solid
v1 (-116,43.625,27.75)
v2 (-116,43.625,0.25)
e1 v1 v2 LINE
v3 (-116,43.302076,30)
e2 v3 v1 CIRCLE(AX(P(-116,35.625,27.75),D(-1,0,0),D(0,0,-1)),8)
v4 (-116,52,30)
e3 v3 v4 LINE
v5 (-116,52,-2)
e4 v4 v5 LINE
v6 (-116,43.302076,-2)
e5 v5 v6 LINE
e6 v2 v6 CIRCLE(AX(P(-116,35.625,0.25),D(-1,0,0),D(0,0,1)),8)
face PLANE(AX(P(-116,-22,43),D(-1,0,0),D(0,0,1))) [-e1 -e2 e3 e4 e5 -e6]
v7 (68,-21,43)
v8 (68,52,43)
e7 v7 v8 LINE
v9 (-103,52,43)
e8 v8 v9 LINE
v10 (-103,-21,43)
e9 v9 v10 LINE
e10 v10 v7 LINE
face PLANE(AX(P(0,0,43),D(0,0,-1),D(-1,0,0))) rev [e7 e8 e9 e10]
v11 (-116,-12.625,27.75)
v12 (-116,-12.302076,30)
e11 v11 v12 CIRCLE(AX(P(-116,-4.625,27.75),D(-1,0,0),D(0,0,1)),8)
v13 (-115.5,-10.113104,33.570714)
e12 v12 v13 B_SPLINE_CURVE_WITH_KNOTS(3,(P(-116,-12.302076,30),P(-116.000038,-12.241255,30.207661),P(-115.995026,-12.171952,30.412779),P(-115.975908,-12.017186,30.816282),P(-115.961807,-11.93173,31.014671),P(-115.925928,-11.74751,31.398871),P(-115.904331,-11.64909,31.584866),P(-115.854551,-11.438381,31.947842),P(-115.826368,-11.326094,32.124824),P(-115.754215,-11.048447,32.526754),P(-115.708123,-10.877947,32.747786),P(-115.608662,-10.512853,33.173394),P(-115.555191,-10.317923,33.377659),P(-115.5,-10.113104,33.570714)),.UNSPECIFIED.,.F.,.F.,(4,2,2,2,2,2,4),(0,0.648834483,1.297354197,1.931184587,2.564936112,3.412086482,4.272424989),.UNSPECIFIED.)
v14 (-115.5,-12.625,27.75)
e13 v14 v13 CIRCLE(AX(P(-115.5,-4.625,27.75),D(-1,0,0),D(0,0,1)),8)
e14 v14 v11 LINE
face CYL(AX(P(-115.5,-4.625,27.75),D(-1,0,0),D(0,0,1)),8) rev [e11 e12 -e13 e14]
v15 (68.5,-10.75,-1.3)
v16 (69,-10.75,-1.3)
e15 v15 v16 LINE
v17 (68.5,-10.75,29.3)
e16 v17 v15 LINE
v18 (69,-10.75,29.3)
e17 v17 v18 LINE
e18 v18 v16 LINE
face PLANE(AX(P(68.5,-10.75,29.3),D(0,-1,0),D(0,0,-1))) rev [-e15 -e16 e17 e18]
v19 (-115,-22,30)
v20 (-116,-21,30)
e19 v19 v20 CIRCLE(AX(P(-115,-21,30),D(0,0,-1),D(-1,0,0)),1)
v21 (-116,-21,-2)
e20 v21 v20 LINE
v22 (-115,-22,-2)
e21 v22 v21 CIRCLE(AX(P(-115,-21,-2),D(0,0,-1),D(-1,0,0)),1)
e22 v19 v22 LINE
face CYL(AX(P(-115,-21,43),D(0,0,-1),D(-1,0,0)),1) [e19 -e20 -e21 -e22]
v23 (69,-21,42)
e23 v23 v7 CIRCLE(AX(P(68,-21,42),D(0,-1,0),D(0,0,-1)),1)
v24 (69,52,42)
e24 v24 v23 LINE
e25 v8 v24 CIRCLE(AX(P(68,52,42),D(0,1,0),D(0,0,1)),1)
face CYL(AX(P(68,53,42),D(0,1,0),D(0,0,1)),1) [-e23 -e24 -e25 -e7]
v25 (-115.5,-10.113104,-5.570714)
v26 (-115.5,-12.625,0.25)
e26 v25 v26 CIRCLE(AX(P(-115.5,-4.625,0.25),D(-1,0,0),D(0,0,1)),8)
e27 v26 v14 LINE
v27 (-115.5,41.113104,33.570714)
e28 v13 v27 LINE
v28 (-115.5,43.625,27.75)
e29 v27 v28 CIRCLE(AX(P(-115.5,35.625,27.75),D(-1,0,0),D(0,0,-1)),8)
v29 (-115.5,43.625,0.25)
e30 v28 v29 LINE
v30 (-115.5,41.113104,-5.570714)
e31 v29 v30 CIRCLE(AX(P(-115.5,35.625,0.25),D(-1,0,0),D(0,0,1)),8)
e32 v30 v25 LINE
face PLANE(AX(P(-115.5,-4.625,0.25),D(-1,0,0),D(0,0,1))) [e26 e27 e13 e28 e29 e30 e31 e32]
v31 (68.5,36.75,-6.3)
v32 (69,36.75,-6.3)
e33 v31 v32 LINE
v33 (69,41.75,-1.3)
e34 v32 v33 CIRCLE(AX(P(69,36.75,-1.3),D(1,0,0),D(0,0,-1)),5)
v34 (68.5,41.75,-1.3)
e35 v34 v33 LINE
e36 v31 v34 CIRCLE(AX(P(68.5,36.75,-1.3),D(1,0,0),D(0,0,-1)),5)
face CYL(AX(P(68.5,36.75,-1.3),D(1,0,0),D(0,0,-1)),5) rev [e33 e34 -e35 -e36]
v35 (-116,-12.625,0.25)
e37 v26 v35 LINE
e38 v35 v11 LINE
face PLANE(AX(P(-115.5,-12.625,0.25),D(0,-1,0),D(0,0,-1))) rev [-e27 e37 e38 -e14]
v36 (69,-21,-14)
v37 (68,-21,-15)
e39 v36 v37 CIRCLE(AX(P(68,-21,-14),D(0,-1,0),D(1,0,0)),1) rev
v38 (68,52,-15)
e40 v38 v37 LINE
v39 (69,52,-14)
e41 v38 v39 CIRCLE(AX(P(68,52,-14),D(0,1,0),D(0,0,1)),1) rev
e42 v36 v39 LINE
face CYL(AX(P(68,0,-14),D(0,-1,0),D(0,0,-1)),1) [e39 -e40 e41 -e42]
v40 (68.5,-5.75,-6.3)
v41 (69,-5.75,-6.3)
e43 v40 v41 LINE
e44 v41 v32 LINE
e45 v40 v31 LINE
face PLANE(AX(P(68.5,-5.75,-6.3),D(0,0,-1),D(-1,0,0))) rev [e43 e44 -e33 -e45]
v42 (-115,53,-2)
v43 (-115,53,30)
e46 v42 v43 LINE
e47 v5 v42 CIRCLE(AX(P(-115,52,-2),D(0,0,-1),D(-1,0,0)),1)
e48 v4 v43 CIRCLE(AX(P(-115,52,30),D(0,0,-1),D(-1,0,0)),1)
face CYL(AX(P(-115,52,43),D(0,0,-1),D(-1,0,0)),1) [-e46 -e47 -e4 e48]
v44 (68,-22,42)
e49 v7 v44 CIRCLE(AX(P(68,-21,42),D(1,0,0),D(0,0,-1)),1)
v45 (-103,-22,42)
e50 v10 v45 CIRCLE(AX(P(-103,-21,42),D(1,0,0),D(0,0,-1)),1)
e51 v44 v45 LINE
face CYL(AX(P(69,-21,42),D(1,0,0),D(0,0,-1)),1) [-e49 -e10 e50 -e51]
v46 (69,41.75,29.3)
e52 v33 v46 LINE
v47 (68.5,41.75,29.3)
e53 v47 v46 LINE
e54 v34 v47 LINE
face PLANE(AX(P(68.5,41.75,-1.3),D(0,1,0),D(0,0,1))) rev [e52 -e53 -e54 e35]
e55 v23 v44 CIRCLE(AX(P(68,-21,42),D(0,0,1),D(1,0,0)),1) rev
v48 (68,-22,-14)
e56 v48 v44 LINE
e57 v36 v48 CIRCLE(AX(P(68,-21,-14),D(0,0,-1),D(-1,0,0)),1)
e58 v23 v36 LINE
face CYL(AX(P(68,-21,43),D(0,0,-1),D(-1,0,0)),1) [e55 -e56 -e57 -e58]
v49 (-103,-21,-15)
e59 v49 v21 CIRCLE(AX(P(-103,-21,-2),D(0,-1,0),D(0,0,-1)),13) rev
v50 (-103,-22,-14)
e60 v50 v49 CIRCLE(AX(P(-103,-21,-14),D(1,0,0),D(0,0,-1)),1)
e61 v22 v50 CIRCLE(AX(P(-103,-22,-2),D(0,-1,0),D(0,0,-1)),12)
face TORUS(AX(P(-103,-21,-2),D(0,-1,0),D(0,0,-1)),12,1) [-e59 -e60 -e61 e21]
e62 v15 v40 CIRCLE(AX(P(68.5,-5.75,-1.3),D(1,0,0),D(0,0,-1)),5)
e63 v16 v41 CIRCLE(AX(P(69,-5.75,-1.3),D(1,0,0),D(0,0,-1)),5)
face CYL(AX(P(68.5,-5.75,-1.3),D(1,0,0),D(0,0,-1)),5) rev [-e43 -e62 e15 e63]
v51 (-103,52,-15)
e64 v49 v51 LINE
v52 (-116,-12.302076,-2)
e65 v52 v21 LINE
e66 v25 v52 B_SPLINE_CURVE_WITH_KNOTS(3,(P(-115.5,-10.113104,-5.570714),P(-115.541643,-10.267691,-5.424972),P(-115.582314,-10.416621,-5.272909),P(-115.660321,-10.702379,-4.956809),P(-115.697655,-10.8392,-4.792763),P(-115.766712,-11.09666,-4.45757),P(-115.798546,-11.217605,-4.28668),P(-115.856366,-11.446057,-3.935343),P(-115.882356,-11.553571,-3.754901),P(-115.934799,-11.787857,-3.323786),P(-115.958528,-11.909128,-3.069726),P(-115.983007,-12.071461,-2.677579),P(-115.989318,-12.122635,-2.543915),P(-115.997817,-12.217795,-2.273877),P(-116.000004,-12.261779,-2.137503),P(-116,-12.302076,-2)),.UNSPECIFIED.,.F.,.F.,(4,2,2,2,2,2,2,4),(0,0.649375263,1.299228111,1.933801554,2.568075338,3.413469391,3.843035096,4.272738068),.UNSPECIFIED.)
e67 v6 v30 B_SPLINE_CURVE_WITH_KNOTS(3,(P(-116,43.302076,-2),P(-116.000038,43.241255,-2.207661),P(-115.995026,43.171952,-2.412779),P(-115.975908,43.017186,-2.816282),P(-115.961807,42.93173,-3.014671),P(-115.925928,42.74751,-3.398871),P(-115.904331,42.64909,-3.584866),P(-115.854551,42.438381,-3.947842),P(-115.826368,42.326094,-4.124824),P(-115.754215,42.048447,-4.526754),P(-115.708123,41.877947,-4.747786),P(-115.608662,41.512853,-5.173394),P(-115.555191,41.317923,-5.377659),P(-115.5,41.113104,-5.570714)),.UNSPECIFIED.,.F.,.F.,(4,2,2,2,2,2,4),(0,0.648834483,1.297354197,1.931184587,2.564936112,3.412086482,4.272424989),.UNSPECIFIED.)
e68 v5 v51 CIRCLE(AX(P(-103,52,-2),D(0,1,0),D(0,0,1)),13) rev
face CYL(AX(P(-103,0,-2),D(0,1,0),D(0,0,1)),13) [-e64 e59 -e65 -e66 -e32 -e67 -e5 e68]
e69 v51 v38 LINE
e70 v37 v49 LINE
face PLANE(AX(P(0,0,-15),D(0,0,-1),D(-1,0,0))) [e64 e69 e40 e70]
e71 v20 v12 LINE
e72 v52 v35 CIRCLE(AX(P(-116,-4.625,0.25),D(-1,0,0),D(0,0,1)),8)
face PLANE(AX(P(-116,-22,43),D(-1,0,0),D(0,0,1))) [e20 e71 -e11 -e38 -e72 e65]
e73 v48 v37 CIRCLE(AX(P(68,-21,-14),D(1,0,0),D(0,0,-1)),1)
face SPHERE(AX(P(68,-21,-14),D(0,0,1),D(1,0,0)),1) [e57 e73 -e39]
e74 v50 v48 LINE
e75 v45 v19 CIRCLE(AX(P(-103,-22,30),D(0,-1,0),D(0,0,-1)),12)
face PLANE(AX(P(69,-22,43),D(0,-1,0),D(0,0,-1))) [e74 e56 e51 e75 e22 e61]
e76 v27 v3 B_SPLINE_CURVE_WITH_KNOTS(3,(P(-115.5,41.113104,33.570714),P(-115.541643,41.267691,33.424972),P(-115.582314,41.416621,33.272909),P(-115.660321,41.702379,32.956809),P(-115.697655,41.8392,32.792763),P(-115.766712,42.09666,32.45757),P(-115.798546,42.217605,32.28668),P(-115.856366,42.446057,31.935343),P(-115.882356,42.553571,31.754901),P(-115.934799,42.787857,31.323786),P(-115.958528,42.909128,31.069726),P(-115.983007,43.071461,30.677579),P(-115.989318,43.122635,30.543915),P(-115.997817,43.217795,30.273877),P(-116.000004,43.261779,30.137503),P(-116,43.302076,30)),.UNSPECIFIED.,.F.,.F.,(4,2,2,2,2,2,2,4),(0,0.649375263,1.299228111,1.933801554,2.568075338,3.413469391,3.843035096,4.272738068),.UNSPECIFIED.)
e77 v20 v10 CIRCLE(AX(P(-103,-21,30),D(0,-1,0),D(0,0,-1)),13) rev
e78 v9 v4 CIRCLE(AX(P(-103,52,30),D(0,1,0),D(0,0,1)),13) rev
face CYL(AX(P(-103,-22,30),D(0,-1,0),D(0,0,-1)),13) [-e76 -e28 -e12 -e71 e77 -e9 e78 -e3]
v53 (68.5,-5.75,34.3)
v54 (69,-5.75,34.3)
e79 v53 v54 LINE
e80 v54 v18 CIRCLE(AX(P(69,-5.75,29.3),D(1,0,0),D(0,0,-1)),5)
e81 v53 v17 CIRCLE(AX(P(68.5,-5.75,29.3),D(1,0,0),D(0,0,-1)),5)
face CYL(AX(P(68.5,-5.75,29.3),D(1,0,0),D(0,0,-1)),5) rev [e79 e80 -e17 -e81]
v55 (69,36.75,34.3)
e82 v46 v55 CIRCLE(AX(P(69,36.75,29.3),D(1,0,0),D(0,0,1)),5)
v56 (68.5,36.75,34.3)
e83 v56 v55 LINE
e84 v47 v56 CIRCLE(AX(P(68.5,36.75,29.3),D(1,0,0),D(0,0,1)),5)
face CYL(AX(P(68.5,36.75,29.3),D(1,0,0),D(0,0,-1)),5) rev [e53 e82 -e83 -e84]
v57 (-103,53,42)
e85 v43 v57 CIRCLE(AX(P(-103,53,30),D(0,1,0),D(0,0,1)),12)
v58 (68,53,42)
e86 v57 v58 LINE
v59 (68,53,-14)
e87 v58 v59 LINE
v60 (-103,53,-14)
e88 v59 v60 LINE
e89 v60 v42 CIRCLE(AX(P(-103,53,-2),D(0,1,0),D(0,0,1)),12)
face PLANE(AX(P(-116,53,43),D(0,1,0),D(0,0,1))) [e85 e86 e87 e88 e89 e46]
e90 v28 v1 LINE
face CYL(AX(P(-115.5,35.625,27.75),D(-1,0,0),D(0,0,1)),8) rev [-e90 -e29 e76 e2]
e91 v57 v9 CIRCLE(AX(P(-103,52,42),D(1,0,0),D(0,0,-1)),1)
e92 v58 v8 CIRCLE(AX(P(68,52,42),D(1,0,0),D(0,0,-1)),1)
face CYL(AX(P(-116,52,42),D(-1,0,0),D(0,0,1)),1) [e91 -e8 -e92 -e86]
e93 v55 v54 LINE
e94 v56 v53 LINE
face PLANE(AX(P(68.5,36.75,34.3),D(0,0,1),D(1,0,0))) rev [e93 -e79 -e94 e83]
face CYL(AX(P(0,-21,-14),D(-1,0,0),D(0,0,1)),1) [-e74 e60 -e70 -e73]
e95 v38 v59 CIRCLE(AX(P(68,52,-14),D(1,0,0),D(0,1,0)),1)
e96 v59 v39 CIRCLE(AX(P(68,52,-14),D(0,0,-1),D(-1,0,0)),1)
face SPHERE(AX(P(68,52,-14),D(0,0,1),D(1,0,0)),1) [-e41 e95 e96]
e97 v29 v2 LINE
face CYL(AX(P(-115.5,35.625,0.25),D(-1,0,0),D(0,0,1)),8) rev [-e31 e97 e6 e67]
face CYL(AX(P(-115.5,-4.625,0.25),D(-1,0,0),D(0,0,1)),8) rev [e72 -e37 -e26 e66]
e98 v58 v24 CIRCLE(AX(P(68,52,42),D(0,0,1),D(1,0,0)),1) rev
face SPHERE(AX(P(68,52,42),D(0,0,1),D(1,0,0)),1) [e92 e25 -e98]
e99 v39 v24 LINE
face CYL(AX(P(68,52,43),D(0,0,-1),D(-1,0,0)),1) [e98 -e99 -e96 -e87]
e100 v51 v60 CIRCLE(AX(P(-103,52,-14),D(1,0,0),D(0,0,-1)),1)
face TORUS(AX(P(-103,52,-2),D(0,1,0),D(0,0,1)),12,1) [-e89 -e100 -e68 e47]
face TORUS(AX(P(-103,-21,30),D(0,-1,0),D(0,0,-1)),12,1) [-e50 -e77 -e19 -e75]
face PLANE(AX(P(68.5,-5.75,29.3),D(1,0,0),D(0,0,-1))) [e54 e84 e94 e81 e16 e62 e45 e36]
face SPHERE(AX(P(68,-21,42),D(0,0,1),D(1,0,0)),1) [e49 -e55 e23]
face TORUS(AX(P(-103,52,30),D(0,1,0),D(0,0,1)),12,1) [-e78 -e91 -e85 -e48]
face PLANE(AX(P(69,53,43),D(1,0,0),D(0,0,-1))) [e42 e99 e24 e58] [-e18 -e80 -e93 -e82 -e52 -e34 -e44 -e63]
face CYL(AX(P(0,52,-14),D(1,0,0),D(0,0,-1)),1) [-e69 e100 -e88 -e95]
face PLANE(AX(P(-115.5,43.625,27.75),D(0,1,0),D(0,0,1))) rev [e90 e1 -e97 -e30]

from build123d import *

# Parameters (mm, degrees)
SKETCH1_W           = 185
SKETCH1_H           = 75
BOSS_EXTRUDE1_DEPTH = 58
CUT_EXTRUDE1_DEPTH  = 0.5
CUT_EXTRUDE2_DEPTH  = 0.5
FILLET1_R           = 13
FILLET2_R           = 1


with BuildPart() as part:
    # Sketch1 → Boss-Extrude1 (new body)
    with BuildSketch(Plane(origin=(0, 0, -15), x_dir=(-1, 0, 0), z_dir=(0, 0, -1))):
        with Locations((23.5, 15.5)):
            Rectangle(SKETCH1_W, SKETCH1_H)
    extrude(amount=-BOSS_EXTRUDE1_DEPTH)

    # Sketch2 → Cut-Extrude1 (cut)
    with BuildSketch(Plane(origin=(69, 0, 0), x_dir=(0, 0, -1), z_dir=(1, 0, 0))):
        with BuildLine():
            Line((-34.3, 36.75), (-34.3, -5.75))
            ThreePointArc((-34.3, -5.75), (-32.835533906, -9.285533906), (-29.3, -10.75))
            Line((-29.3, -10.75), (1.3, -10.75))
            ThreePointArc((1.3, -10.75), (4.835533906, -9.285533906), (6.3, -5.75))
            Line((6.3, -5.75), (6.3, 36.75))
            ThreePointArc((6.3, 36.75), (4.835533906, 40.285533906), (1.3, 41.75))
            Line((1.3, 41.75), (-29.3, 41.75))
            ThreePointArc((-29.3, 41.75), (-32.835533906, 40.285533906), (-34.3, 36.75))
        make_face()
    extrude(amount=-CUT_EXTRUDE1_DEPTH, mode=Mode.SUBTRACT)

    # Sketch3 → Cut-Extrude2 (cut)
    with BuildSketch(Plane.ZY.offset(116)):
        with BuildLine():
            Line((27.75, 43.625), (0.25, 43.625))
            ThreePointArc((0.25, 43.625), (-5.406854249, 41.281854249), (-7.75, 35.625))
            Line((-7.75, 35.625), (-7.75, -4.625))
            ThreePointArc((-7.75, -4.625), (-5.406854249, -10.281854249), (0.25, -12.625))
            Line((0.25, -12.625), (27.75, -12.625))
            ThreePointArc((27.75, -12.625), (33.406854249, -10.281854249), (35.75, -4.625))
            Line((35.75, -4.625), (35.75, 35.625))
            ThreePointArc((35.75, 35.625), (33.406854249, 41.281854249), (27.75, 43.625))
        make_face()
    extrude(amount=-CUT_EXTRUDE2_DEPTH, mode=Mode.SUBTRACT)

    # Fillet1
    # the kernel refuses this fillet: 13 mm, written as the material it takes off along each edge
    with BuildSketch(Plane(origin=(-116, -54.5, -15), x_dir=(0, 0, 1), z_dir=(0, 1, 0))) as fillet1_piece_1:
        with BuildLine():
            CenterArc((FILLET1_R, FILLET1_R), FILLET1_R, 180, 90)
            Line((0, FILLET1_R), (0, 0))
            Line((0, 0), (FILLET1_R, 0))
        make_face()
    extrude(amount=140, mode=Mode.SUBTRACT)
    with BuildSketch(Plane(origin=(-116, -54.5, 43), x_dir=(0, 0, -1), z_dir=(0, 1, 0))) as fillet1_piece_2:
        with BuildLine():
            CenterArc((FILLET1_R, -FILLET1_R), FILLET1_R, 90, 90)
            Line((0, -FILLET1_R), (0, 0))
            Line((0, 0), (FILLET1_R, 0))
        make_face()
    extrude(amount=140, mode=Mode.SUBTRACT)

    # Fillet2
    fillet2_edges = [part.edges().sort_by_distance(p)[0] for p in [
        (69, 15.5, 43),
        (-17, -22, -15),
        (69, 15.5, -15),
        (-17, 53, -15),
        (-116, 53, 14),
        (-17, 53, 43),
        (-112.192388155, 53, 39.192388155),
        (-112.192388155, 53, -11.192388155),
        (-116, -22, 14),
        (-17, -22, 43),
        (-112.192388155, -22, 39.192388155),
        (69, 53, 14),
        (-112.192388155, -22, -11.192388155),
        (69, -22, 14),
    ]]
    fillet(fillet2_edges, radius=FILLET2_R)


solid = part.part
